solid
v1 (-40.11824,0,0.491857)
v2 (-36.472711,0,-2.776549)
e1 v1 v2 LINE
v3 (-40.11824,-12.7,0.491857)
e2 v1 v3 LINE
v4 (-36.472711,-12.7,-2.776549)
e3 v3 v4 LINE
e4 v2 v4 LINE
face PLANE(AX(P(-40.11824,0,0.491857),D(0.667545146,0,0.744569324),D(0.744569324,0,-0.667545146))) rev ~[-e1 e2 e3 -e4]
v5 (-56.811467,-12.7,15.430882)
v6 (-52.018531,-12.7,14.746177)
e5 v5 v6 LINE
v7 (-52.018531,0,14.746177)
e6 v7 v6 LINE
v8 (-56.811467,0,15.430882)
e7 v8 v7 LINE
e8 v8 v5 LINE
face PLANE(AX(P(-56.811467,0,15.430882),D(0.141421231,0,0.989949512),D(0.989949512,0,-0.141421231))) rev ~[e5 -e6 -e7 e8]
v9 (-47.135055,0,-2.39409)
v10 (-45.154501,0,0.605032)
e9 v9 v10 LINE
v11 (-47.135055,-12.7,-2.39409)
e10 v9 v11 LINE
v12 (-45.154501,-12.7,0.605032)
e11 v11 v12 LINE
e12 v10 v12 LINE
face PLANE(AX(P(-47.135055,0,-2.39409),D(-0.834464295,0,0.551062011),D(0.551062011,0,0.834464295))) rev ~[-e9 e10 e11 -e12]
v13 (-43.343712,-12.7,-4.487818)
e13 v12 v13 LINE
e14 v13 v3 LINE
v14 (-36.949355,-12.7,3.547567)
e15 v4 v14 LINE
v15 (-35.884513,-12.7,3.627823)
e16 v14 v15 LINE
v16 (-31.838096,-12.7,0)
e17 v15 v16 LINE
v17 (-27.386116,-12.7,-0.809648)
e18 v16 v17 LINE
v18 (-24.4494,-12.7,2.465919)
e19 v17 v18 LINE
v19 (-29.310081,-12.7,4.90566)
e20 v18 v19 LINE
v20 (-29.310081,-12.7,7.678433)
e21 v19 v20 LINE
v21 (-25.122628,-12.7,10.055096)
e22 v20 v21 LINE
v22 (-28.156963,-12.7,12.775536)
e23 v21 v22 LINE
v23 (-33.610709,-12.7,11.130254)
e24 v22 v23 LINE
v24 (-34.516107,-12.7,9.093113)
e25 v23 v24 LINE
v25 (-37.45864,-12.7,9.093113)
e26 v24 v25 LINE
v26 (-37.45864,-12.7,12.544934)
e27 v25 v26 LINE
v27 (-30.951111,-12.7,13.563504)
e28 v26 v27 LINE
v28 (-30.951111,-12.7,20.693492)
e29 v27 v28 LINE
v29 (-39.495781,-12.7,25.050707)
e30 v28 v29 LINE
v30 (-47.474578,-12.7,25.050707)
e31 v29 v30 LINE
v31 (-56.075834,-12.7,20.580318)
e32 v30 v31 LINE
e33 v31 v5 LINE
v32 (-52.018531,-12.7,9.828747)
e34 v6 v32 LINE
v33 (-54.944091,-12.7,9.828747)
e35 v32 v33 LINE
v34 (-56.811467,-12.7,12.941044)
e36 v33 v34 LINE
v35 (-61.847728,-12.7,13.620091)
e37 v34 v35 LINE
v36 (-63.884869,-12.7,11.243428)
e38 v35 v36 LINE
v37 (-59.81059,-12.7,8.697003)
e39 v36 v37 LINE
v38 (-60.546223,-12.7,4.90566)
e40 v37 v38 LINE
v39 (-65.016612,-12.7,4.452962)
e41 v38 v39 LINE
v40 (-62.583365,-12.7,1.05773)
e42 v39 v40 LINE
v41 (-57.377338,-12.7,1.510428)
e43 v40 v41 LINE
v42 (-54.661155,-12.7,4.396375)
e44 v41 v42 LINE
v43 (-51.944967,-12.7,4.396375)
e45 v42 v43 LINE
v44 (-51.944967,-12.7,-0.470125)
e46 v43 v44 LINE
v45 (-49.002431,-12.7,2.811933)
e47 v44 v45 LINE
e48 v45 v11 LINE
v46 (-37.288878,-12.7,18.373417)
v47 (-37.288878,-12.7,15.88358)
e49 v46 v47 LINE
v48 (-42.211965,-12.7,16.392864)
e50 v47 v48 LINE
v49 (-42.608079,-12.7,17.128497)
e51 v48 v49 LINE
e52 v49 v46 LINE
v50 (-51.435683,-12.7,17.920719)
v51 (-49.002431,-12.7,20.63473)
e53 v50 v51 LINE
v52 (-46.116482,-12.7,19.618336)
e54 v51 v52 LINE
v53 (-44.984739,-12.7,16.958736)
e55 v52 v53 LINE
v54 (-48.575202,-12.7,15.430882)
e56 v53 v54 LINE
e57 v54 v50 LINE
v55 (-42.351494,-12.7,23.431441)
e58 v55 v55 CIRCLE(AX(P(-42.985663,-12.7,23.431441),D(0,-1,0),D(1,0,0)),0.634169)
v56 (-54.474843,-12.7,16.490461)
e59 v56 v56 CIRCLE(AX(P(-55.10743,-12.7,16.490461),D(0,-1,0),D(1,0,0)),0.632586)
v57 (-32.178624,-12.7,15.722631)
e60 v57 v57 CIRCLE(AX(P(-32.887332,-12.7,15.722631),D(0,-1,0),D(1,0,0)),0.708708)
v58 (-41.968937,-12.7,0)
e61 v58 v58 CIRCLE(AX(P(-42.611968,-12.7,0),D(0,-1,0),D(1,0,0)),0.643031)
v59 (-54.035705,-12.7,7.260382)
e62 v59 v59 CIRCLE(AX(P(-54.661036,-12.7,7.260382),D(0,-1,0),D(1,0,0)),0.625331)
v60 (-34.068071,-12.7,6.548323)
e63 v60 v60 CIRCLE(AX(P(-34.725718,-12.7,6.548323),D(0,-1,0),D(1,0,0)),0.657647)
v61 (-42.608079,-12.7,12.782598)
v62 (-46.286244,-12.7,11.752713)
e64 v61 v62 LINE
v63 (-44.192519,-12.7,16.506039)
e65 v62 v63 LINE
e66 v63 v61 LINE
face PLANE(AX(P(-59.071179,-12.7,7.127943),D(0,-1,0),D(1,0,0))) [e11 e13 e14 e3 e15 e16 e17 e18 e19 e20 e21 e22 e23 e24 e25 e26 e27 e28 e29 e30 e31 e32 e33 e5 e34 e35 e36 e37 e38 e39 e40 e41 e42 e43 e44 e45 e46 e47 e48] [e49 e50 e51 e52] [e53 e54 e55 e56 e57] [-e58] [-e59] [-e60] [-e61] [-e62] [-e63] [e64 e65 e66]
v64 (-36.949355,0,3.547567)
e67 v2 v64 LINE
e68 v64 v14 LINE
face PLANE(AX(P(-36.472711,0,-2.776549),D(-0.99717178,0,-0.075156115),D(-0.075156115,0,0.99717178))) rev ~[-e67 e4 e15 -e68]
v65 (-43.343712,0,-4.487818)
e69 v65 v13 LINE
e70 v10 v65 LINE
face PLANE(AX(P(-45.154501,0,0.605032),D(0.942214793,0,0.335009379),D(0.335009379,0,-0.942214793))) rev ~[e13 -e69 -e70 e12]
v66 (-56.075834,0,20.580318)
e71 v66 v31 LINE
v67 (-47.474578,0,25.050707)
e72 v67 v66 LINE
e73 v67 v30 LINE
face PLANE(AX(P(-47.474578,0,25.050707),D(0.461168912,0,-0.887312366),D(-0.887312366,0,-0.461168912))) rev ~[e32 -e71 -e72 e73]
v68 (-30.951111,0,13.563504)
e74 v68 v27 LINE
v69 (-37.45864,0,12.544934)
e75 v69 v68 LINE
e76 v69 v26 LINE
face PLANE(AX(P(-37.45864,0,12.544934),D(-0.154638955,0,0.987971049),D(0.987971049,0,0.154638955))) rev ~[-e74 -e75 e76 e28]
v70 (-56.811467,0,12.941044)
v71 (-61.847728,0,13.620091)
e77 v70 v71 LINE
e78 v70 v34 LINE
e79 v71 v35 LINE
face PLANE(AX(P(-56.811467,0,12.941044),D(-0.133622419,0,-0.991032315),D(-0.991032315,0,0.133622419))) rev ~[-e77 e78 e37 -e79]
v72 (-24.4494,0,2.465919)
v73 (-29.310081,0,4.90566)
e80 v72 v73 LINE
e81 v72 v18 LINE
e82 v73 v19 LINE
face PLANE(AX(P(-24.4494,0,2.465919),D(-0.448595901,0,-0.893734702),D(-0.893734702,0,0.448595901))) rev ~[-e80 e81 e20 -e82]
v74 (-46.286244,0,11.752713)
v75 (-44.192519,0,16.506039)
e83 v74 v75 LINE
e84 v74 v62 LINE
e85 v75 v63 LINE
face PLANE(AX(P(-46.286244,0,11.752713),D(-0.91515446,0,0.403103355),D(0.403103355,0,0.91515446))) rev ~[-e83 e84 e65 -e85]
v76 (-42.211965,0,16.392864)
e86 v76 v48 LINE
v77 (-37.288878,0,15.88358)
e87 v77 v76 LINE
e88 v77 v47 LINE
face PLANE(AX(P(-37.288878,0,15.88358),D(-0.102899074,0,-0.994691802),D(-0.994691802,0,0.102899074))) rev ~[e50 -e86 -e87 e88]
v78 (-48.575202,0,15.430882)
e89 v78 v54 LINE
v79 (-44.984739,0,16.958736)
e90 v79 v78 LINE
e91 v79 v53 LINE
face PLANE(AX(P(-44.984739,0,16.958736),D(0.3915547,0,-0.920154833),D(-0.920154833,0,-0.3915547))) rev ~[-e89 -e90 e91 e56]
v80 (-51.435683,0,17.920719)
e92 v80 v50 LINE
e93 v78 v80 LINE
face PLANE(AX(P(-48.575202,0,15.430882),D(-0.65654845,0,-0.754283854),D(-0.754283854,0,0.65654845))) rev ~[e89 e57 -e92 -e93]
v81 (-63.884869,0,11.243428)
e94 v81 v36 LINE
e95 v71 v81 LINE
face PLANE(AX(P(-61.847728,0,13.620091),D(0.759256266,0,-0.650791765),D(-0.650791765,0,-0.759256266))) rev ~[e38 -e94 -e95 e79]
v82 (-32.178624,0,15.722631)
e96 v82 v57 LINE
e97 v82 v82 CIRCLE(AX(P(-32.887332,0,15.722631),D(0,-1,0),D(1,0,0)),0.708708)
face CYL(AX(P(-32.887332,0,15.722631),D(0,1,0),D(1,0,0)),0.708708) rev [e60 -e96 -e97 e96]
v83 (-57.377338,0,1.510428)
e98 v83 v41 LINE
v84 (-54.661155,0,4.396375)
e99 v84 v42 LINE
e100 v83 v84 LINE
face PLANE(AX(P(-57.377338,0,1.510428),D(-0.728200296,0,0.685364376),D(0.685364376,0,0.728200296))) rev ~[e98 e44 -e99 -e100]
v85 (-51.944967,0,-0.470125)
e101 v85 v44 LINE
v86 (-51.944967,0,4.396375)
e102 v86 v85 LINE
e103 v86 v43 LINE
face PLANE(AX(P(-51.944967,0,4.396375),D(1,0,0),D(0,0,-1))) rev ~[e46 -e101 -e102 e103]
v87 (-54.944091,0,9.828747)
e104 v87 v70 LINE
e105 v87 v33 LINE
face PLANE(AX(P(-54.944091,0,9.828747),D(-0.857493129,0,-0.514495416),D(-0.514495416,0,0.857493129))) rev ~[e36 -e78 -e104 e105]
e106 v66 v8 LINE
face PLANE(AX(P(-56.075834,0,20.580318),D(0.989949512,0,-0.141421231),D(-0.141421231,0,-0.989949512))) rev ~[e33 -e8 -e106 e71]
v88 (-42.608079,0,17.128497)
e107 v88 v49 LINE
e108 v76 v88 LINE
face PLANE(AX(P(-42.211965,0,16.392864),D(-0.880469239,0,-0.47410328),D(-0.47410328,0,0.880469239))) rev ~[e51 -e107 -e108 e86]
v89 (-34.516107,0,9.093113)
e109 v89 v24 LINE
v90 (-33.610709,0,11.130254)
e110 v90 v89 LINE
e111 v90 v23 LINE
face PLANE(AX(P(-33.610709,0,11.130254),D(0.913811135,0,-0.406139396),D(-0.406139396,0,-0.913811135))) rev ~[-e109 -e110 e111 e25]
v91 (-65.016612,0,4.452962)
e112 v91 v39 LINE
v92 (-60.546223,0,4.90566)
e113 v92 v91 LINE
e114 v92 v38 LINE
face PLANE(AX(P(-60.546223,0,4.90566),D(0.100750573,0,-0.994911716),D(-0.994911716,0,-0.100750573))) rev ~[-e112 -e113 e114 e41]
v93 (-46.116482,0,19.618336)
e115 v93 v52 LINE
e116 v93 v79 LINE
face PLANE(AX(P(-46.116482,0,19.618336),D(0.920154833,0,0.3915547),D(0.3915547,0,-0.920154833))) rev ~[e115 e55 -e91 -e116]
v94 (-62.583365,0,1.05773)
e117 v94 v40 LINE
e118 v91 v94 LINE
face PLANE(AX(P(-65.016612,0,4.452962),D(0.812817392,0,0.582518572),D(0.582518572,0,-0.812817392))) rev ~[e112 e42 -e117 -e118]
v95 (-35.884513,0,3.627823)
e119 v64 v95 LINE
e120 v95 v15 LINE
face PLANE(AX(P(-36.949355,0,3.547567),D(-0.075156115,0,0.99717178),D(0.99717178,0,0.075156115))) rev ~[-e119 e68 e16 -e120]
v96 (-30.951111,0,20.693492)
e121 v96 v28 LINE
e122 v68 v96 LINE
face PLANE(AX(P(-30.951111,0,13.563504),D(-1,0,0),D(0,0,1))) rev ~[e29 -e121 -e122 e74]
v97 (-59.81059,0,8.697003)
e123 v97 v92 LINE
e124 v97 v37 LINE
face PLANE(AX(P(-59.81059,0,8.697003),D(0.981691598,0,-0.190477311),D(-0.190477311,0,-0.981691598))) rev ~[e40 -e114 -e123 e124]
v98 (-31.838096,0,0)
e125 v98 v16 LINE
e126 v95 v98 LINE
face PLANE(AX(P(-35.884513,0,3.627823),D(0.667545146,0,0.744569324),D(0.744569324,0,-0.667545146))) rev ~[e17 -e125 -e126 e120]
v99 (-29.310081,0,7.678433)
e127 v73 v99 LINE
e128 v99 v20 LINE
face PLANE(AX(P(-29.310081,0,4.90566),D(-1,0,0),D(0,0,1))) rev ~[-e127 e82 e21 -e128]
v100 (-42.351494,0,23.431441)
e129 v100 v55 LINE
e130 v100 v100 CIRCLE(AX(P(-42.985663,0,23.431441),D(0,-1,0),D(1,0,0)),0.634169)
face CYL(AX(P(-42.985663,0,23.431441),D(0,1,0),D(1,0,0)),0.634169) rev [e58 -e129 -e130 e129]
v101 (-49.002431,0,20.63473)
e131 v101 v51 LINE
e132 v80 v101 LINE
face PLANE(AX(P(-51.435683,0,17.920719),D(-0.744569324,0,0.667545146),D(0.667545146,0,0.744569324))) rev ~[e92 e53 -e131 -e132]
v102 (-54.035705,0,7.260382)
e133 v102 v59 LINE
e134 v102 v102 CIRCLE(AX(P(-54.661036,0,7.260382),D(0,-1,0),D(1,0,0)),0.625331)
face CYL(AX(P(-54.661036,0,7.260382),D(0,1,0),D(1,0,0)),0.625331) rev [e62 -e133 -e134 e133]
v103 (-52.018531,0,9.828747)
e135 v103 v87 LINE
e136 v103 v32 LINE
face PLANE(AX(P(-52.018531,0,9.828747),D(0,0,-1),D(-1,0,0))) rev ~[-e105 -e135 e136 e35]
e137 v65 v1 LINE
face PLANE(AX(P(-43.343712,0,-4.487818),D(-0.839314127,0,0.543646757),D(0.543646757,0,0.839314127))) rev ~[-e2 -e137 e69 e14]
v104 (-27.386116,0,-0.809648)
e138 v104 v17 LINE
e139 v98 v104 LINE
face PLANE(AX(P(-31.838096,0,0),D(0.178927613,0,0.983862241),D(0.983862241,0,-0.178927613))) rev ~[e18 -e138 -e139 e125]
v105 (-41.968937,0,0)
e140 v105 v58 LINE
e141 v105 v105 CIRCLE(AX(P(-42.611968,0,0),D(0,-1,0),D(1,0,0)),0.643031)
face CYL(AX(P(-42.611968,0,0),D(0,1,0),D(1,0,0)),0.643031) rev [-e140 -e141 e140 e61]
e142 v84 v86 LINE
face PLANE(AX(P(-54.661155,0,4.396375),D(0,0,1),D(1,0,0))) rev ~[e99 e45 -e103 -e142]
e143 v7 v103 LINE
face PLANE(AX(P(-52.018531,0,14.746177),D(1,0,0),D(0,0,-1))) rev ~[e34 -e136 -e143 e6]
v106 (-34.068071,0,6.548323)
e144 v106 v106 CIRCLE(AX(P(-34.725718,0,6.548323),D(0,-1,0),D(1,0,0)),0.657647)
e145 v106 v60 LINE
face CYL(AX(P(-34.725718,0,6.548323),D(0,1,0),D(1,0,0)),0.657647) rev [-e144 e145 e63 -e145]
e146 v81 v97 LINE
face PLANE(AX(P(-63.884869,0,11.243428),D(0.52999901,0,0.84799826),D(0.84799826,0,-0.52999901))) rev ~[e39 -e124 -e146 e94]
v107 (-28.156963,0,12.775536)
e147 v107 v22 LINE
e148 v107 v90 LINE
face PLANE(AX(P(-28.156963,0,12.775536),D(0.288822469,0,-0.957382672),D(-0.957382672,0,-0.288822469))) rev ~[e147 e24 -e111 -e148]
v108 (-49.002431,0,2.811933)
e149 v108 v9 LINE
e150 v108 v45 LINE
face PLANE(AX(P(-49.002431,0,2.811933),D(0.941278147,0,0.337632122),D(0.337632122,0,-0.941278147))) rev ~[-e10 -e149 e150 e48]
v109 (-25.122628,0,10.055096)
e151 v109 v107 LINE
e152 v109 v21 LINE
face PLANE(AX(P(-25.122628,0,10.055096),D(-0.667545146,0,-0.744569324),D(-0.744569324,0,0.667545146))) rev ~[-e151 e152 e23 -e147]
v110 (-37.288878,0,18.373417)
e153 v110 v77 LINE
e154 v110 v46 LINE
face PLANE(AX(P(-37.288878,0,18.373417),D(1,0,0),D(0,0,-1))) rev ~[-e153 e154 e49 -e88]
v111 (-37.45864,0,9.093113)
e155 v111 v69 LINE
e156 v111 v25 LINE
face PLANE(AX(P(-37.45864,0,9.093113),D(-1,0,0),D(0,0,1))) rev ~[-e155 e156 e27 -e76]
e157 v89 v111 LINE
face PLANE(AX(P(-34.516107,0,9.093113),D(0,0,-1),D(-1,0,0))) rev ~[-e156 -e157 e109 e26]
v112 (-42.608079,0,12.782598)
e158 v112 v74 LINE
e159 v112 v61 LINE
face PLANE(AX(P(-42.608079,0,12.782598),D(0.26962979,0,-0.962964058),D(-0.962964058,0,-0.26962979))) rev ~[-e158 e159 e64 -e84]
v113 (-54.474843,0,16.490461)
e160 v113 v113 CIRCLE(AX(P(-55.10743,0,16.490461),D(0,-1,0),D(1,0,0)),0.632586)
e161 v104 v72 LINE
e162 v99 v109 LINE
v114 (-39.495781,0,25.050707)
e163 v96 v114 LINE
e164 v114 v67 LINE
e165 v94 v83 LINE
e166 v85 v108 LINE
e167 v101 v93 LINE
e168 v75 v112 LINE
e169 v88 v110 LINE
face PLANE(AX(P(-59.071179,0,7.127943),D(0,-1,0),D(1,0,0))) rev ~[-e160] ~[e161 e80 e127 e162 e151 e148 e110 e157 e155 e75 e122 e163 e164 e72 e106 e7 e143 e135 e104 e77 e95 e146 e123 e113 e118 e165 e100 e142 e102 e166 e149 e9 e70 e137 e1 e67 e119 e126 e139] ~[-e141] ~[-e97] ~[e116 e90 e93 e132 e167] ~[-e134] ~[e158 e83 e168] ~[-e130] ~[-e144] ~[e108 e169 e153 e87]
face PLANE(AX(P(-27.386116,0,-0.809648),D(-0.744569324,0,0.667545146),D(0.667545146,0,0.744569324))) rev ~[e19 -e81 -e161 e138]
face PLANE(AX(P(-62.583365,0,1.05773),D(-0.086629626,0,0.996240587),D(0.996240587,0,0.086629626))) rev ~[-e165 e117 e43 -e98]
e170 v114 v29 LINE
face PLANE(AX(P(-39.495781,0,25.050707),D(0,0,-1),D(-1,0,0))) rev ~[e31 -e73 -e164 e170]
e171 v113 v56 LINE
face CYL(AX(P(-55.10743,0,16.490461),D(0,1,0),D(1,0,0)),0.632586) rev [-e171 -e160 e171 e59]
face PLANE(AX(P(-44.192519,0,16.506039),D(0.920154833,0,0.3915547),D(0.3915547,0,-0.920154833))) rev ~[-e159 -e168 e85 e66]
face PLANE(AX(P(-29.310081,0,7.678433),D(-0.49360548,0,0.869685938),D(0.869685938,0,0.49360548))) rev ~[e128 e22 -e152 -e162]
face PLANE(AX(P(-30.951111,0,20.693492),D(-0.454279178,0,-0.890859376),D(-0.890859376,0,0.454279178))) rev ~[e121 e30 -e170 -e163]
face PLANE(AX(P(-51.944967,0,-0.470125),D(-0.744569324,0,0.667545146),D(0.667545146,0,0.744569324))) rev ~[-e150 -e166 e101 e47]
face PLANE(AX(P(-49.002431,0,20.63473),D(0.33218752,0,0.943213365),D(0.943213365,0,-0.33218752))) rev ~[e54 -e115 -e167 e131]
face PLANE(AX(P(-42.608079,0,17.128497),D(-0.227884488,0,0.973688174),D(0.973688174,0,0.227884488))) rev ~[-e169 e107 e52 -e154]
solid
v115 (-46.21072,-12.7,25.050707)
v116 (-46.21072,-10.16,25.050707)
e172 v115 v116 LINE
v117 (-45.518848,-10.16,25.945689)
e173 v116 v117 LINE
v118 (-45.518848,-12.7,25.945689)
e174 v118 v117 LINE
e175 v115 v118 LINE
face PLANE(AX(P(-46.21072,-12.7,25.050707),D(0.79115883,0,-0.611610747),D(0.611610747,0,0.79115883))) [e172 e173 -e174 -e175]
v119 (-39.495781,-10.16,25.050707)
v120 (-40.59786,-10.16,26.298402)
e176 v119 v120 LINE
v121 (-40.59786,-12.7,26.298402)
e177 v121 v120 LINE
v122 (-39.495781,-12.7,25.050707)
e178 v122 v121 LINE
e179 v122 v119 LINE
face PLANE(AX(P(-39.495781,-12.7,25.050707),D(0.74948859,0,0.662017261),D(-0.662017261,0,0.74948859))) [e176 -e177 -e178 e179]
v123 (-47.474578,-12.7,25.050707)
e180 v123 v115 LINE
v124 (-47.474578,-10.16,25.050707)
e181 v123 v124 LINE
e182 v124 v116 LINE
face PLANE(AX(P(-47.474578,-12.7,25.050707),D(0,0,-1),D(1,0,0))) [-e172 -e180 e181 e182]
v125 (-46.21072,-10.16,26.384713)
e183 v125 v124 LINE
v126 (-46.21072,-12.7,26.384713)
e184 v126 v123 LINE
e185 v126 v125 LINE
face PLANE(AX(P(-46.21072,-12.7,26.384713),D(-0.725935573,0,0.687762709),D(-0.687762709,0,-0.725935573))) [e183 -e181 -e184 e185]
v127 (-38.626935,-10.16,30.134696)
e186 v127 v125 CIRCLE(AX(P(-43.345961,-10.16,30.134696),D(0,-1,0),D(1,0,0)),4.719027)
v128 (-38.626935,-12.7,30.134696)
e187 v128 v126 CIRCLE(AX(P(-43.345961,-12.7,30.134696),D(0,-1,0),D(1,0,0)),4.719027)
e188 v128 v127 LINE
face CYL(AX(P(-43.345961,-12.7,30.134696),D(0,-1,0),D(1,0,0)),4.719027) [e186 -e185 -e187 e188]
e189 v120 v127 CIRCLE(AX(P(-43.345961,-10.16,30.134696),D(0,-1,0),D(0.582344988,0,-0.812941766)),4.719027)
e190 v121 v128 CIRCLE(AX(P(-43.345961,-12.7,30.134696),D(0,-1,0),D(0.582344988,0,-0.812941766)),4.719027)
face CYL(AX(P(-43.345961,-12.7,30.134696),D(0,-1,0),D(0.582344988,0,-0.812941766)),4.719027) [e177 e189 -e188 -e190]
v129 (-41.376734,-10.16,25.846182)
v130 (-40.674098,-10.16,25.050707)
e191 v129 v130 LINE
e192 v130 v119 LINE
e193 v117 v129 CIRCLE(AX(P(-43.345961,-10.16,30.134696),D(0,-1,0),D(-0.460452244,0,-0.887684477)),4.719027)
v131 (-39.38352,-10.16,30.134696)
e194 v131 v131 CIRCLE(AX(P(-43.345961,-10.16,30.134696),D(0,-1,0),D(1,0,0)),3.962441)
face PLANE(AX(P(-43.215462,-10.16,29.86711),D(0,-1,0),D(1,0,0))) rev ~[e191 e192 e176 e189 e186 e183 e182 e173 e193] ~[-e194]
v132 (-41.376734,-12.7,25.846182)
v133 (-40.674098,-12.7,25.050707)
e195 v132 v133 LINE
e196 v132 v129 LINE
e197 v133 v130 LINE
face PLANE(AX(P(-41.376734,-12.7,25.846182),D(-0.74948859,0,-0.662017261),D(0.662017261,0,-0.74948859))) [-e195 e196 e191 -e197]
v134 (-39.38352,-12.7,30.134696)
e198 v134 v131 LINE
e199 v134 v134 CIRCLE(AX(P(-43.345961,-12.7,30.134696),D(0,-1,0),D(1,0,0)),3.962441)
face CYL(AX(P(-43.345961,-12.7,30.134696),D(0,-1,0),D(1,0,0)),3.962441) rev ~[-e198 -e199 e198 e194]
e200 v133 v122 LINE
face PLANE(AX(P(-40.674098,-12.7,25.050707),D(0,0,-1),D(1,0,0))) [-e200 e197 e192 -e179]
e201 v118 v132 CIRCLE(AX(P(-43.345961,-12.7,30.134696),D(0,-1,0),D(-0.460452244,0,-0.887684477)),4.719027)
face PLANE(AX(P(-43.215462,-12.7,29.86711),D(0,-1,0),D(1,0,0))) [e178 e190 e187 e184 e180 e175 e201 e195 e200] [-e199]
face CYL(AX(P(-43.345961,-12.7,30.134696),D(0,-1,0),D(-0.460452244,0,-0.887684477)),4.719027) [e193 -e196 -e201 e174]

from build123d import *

# Parameters (mm, degrees)
F0_R     = 0.6253308063
F0_R_2   = 0.6576470557
F0_R_3   = 0.6430310393
F0_R_4   = 0.6325864549
F0_R_5   = 0.7087084558
F0_R_6   = 0.63416899
F1_DEPTH = 12.7
F3_R     = 3.9624414974
F4_DEPTH = 2.54


# Not quite as in the source:
# - the program builds the solid bodies; features that only make, move or delete a surface that nothing else refers to are left out


with BuildPart() as f1:
    # F0 (on Front) → F1 (new body)
    with BuildSketch(Plane.XZ):
        Polygon((-61.8477277458, 13.6200906709), (-63.8848692179, 11.2434281036), (-59.810589999, 8.6970031261), (-60.5462230742, 4.9056601711), (-65.0166124105, 4.4529624283), (-62.5833645463, 1.0577295907), (-57.3773384094, 1.5104275662), (-54.661154747, 4.3963752687), (-53.1898848712, 4.3963752687), (-53.1898848712, 9.8287472501), (-54.9440905452, 9.8287472501), (-56.8114668131, 12.941043824), align=None)
        with Locations((-54.6610355377, 7.2603821754)):
            Circle(F0_R, mode=Mode.SUBTRACT)
        Polygon((-34.516107291, 9.0931132436), (-35.9873734415, 9.0931132436), (-35.8845129038, 3.6278230993), (-31.8380962585, 0), (-27.3861158639, -0.8096481324), (-24.4493998371, 2.4659185885), (-29.3100811541, 4.9056601711), (-29.3100811541, 7.6784333214), (-25.1226276159, 10.0550958887), (-28.1569631866, 12.7755356355), (-33.6107090116, 11.1302537844), align=None)
        with Locations((-34.7257182002, 6.5483227372)):
            Circle(F0_R_2, mode=Mode.SUBTRACT)
        Polygon((-52.0185305594, 9.8287472501), (-53.1898848712, 9.8287472501), (-53.1898848712, 4.3963752687), (-51.9449673593, 4.3963752687), (-51.9449673593, -0.4701253201), (-49.0024313331, 2.8119329363), (-47.1350550652, -2.3940897081), (-45.1545007527, 0.6050316733), (-43.3437116444, -4.4878176413), (-40.11823982, 0.4918571794), (-36.4727111343, -2.7765490017), (-36.9493551552, 3.54756671), (-35.8845129038, 3.6278230993), (-35.9873734415, 9.0931132436), (-37.4586395919, 9.0931132436), (-37.4586395919, 12.5449337065), (-30.9511106461, 13.5635035113), (-30.9511106461, 20.6934921443), (-39.495781064, 25.0507071614), (-47.474578023, 25.0507071614), (-56.0758337379, 20.5803178251), (-56.8114668131, 15.4308816418), (-52.0185305594, 14.7461770819), align=None)
        with Locations((-42.6119677722, 0)):
            Circle(F0_R_3, mode=Mode.SUBTRACT)
        with Locations((-55.1074296236, 16.4904613048)):
            Circle(F0_R_4, mode=Mode.SUBTRACT)
        Polygon((-48.5752017703, 15.4308816418), (-51.4356829226, 17.9207194597), (-49.0024313331, 20.6347298909), (-46.1164824665, 19.6183361113), (-44.9847392738, 16.9587358832), align=None, mode=Mode.SUBTRACT)
        Polygon((-42.6080785692, 12.7825982869), (-46.2862439454, 11.7527125403), (-44.1925190389, 16.5060386062), align=None, mode=Mode.SUBTRACT)
        Polygon((-42.2119647264, 16.3928642869), (-42.6080785692, 17.1284973621), (-37.288878113, 18.3734167367), (-37.288878113, 15.8835798502), align=None, mode=Mode.SUBTRACT)
        with Locations((-32.8873321414, 15.7226305455)):
            Circle(F0_R_5, mode=Mode.SUBTRACT)
        with Locations((-42.985662818, 23.4314408153)):
            Circle(F0_R_6, mode=Mode.SUBTRACT)
    extrude(amount=F1_DEPTH)


with BuildPart() as f4:
    # F3 (on face) → F4 (new body)
    with BuildSketch(Plane.XZ.offset(12.7)):
        with BuildLine():
            ThreePointArc((-40.5978600179, 26.2984021236), (-39.1484875063, 27.9782117542), (-38.6269349154, 30.1346959223))
            ThreePointArc((-38.6269349154, 30.1346959223), (-45.437652272, 34.3648308471), (-46.2107199183, 26.3847131282))
            ThreePointArc((-46.2107199183, 26.3847131282), (-45.8743308801, 26.1501557938), (-45.5188478641, 25.9456892843))
            ThreePointArc((-45.5188478641, 25.9456892843), (-43.4592958766, 25.4170304905), (-41.3767340339, 25.8461816066))
            ThreePointArc((-41.3767340339, 25.8461816066), (-40.9764839308, 26.053668122), (-40.5978600179, 26.2984021236))
        make_face()
        with Locations((-43.3459614898, 30.1346959223)):
            Circle(F3_R, mode=Mode.SUBTRACT)
        with BuildLine():
            Line((-46.2107199183, 26.3847131282), (-47.474578023, 25.0507071614))
            Line((-47.474578023, 25.0507071614), (-46.2107199183, 25.0507071614))
            Line((-46.2107199183, 25.0507071614), (-45.5188478641, 25.9456892843))
            ThreePointArc((-45.5188478641, 25.9456892843), (-45.8743308801, 26.1501557938), (-46.2107199183, 26.3847131282))
        make_face()
        with BuildLine():
            Line((-41.3767340339, 25.8461816066), (-40.674097836, 25.0507071614))
            Line((-40.674097836, 25.0507071614), (-39.495781064, 25.0507071614))
            Line((-39.495781064, 25.0507071614), (-40.5978600179, 26.2984021236))
            ThreePointArc((-40.5978600179, 26.2984021236), (-40.9764839308, 26.053668122), (-41.3767340339, 25.8461816066))
        make_face()
    extrude(amount=-F4_DEPTH)


solid = Compound([f1.part, f4.part])
